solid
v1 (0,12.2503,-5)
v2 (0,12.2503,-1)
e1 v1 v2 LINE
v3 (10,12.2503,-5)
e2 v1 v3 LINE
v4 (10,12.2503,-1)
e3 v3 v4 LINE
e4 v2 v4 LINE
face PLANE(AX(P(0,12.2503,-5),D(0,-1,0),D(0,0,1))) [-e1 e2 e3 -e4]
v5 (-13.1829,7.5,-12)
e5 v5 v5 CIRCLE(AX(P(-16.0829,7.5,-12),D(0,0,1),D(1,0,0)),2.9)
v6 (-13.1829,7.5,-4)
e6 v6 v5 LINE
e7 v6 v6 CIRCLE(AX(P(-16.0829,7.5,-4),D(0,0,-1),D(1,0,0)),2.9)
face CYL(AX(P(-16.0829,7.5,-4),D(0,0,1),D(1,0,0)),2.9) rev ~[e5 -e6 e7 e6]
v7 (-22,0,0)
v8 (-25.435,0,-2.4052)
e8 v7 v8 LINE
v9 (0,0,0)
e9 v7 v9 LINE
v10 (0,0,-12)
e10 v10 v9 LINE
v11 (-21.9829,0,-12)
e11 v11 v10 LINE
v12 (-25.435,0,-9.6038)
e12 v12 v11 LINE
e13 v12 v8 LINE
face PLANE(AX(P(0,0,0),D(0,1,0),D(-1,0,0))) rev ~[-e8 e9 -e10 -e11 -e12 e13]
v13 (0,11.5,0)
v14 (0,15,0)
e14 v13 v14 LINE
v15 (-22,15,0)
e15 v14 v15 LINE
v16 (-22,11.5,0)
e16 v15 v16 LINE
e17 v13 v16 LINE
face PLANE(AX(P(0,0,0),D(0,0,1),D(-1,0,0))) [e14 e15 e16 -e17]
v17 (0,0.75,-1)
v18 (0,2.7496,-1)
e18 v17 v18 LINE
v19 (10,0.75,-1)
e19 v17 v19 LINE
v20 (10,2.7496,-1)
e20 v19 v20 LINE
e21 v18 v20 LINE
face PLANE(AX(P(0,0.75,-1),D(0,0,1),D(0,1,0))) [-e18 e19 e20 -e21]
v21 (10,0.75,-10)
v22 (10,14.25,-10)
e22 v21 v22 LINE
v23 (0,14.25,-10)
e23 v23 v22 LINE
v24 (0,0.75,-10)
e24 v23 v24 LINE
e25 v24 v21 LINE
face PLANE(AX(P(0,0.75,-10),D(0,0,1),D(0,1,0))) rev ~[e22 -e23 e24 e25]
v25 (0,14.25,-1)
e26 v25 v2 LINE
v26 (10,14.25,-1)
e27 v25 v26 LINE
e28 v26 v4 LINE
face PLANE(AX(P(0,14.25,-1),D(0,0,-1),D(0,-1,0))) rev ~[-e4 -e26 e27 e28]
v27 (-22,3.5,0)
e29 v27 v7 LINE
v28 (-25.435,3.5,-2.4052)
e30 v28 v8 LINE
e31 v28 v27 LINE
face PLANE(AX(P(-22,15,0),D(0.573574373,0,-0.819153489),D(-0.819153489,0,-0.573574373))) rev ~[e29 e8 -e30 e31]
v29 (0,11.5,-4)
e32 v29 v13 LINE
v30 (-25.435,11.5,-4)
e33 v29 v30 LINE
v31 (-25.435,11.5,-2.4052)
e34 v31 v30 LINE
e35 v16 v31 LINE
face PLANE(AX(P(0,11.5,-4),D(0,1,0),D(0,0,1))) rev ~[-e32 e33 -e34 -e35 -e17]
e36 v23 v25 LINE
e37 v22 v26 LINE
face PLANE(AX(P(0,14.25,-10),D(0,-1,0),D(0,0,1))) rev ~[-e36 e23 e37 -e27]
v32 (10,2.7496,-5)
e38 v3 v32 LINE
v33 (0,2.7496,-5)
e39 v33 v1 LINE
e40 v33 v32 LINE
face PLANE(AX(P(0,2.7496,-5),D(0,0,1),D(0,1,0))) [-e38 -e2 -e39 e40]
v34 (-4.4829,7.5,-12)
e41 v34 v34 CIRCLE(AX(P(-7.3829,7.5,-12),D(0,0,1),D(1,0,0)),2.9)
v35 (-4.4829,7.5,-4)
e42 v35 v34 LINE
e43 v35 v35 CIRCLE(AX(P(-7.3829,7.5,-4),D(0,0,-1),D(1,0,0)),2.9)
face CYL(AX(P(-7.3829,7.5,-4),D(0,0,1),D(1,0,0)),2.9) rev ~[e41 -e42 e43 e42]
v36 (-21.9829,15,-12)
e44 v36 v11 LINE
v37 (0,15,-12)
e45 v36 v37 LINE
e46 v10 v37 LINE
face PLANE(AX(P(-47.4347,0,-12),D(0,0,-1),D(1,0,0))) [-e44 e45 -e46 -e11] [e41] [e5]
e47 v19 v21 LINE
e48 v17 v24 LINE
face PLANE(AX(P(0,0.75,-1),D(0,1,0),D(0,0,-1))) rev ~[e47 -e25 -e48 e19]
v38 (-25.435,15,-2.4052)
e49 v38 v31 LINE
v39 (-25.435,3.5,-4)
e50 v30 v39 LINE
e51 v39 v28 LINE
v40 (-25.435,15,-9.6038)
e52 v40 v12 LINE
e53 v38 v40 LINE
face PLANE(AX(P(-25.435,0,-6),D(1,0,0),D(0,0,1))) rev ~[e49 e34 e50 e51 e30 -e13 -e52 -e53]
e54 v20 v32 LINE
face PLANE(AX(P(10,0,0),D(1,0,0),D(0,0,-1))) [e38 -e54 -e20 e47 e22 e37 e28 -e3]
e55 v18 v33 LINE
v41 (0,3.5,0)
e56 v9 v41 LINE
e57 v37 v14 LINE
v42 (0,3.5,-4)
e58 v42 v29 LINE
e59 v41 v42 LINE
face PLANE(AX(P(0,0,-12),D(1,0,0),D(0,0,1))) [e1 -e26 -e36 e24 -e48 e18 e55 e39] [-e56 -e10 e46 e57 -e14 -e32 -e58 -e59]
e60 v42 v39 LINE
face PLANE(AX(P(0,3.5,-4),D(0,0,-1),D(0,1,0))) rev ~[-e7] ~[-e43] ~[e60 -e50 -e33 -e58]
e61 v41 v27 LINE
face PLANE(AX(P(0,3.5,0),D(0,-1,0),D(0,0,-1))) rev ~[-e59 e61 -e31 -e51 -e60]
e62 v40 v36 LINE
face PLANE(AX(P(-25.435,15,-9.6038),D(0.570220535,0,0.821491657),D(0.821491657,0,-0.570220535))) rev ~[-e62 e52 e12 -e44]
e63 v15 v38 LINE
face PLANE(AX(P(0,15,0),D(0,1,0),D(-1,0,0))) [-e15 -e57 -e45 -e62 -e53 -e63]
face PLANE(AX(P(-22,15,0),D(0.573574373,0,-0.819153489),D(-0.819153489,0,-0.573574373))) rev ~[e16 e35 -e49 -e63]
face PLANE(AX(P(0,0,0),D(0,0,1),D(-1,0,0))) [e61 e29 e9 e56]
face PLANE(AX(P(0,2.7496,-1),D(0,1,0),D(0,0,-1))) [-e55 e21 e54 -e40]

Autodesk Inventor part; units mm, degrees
ref_plane "YZ Plane" through (0, 0, 0) normal (1, 0, 0) x (0, 1, 0)
ref_plane "XZ Plane" through (0, 0, 0) normal (0, 1, 0) x (-1, 0, 0)
ref_plane "XY Plane" through (0, 0, 0) normal (0, 0, 1) x (1, 0, 0)
sketch "Náčrt1" plane through (0, 0, 0) normal (0, 1, 0) x (-1, 0, 0)
  line L0 (0, 0) -> (50, 0)
  line L1 (50, 0) -> (66.0697, -19.1511)
  line L2 (50, 0) -> (75, 0) construction
  line L3 (66.0697, -19.1511) -> (58.4092, -25.579)
  line L4 (0, -12) -> (0, 0)
  line L5 (58.6554, -25.3724) -> (47.4347, -12)
  line L6 (47.4347, -12) -> (0, -12)
  dimension "d0" = 50
  dimension "d2" = 25
  dimension "d3" = 50
  dimension "d4" = 10
  dimension "d5" = 12
extrude "Vysunutí1" add sketch "Náčrt1" along normal blind 15
sketch "Náčrt11" plane through (0, 0, 0) normal (1, 0, 0) x (0, 0, -1)
  line L0 (0, 0) -> (0, 15) projected
  line L1 (0, 7.5) -> (12, 7.5)
  line L2 (12, 0) -> (12, 15) projected
  line L3 (0, 3.5) -> (4, 3.5)
  line L4 (4, 3.5) -> (4, 11.5)
  line L5 (4, 11.5) -> (0, 11.5)
  line L6 (0, 11.5) -> (0, 3.5)
  point P0 (0, 7.5)
  point P1 (0, 11.5)
  dimension "d64" = 4
  dimension "d65" = 8
extrude "Vysunutí10" cut sketch "Náčrt11" against normal through all
sketch "Náčrt21" plane through (-66.0697, 0, -19.1511) normal (-0.6427876, 0, -0.7660444) x (-0.7660444, 0, 0.6427876)
  line L0 (0, 0) -> (0, 15) projected
  line L1 (0, 3.5) -> (-4, 3.5)
  line L2 (-4, 3.5) -> (-4, 11.5)
  line L3 (-4, 11.5) -> (0, 11.5)
  line L4 (0, 11.5) -> (0, 3.5)
  point P0 (-38.3022, 0)
  point P1 (0, 7.5)
  point P2 (0, 11.5)
  dimension "d68" = 4
  dimension "d69" = 8
extrude "Vysunutí11" cut sketch "Náčrt21" against normal through all
sketch "Náčrt30" plane through (0, 0, -12) normal (0, 0, -1) x (-1, 0, 0)
  point P0 (0, 0)
sketch "Náčrt31" plane through (0, 0, 0) normal (1, 0, 0) x (0, 0, -1)
  point P0 (0, 0)
sketch "Náčrt32" plane through (0, 0, 0) normal (0, -1, 0) x (1, 0, 0)
  line L0 (-47.4347, -12) -> (-58.6554, -25.3724) projected
  line L1 (-47.4347, -12) -> (-47.4347, 0)
  line L2 (-47.4347, -12) -> (-58.6554, -25.3724)
  line L3 (-58.6554, -25.3724) -> (-66.0697, -19.1511) projected
  line L4 (-66.0697, -19.1511) -> (-50, 0)
  line L5 (-50, 0) -> (-47.4347, 0)
  line L6 (-50, 0) -> (0, 0) projected
  point P0 (-47.4347, 0)
extrude "Vysunutí16" add sketch "Náčrt32" against normal through all
sketch "Náčrt33" plane through (0, 0, 0) normal (0, -1, 0) x (1, 0, 0)
  line L0 (-47.4347, -12) -> (-58.6554, -25.3724) projected
  line L1 (-47.4347, -4) -> (-47.4347, 0) projected
  line L2 (-47.4347, -12) -> (-47.4347, 0)
  line L3 (-66.0697, -19.1511) -> (-50, 0) projected
  line L4 (-47.4347, 0) -> (-50, 0)
  line L5 (-50, 0) -> (-66.0697, -19.1511)
  line L6 (-50, 0) -> (0, 0) projected
  line L7 (-66.0697, -19.1511) -> (-50, 0) projected
  line L8 (-58.6554, -25.3724) -> (-66.0697, -19.1511) projected
  line L9 (-47.4347, -12) -> (-58.6554, -25.3724) projected
  line L10 (0, -12) -> (-47.4347, -12) projected
  line L11 (0, 0) -> (0, -12) projected
  line L12 (-58.6554, -25.3724) -> (-66.0697, -19.1511) projected
  line L13 (-66.0697, -19.1511) -> (-58.6554, -25.3724)
  line L14 (-58.6554, -25.3724) -> (-47.4347, -12)
extrude "Vysunutí17" cut sketch "Náčrt33" against normal through all contours L0 L8 L3 L4 L1 L2
sketch "Náčrt34" plane through (0, 0, 0) normal (0, -1, 0) x (1, 0, 0)
  line L0 (-47.4347, 0) -> (-47.4347, -12) projected
  line L1 (-47.4347, 0) -> (-47.4347, -12) projected
  line L2 (0, -12) -> (-47.4347, -12) projected
  line L3 (0, 0) -> (0, -12) projected
  line L4 (-47.4347, 0) -> (0, 0) projected
  line L5 (0, -12) -> (-47.4347, -12) projected
  line L6 (-44, -12) -> (-47.4347, -9.595)
  line L7 (-44, -12) -> (-39.807, -12) construction
  line L8 (-47.4347, -9.595) -> (-47.4347, -12)
  line L9 (-44, -12) -> (-47.4347, -12)
  line L10 (0, 0) -> (-47.4347, 0) projected
  line L11 (-44, 0) -> (-47.0563, -2.14)
  line L12 (-44, 0) -> (-40.269, 0) construction
  line L13 (-47.0563, -2.14) -> (-47.4347, -2.405)
  line L14 (-47.4347, -2.405) -> (-47.4347, 0)
  line L15 (-44, 0) -> (-47.4347, 0)
  dimension "d99" = 145
  dimension "d100" = 145
extrude "Vysunutí18" cut sketch "Náčrt34" against normal through all contours L4 L11 L13 L0 | L6 L2 L0
sketch "Náčrt39" plane through (0, 0, 0) normal (1, 0, 0) x (0, 0, -1)
  line L0 (0, 11.5) -> (0, 15) projected
  line L1 (12, 0) -> (12, 15) projected
  line L2 (0, 0) -> (0, 3.5) projected
  line L3 (1, 0.75) -> (10, 0.75)
  line L4 (10, 14.25) -> (1, 14.25)
  line L5 (1, 14.25) -> (1, 12.2503)
  line L6 (4, 4.7) -> (4, 10.3) projected
  line L7 (5, 12.2503) -> (1, 12.2503)
  line L8 (1, 0.75) -> (1, 2.7496)
  line L9 (1, 2.7496) -> (5, 2.7496)
  line L10 (5, 2.7496) -> (5, 12.2503)
  line L11 (10, 0.75) -> (10, 14.25)
  line L12 (4, 7.5) -> (12, 7.5)
  line L13 (12, 9.95) -> (12, 5.05) projected
  point P0 (1, 1.7498)
  point P1 (5, 7.5)
  point P2 (1, 13.2502)
  point P3 (10, 7.5)
  point P4 (5.5, 0.75)
  dimension "d119" = 13.5
extrude "Vysunutí22" add sketch "Náčrt39" along normal blind 10
sketch "Náčrt40" plane through (0, 0, 0) normal (0, -1, 0) x (1, 0, 0)
  line L0 (-47.4347, -2.405) -> (-47.4347, -9.595) projected
  line L1 (-47.4347, -6) -> (0, -6)
  line L2 (-44, 0) -> (-47.4347, -2.405) projected
  line L3 (-47.4347, -2.405) -> (-47.4347, -9.595) projected
  line L4 (-47.4347, -9.595) -> (-44, -12) projected
  line L5 (0, -12) -> (-44, -12) projected
  line L6 (0, 0) -> (0, -12) projected
  line L7 (-44, 0) -> (0, 0) projected
  line L8 (-27.885, -6) -> (-22.985, -6) projected
  line L9 (-25.435, -6) -> (-25.435, 0)
  line L10 (-25.435, -6) -> (-25.435, -12)
  dimension "d124" = 47.4347
extrude "Vysunutí24" cut sketch "Náčrt40" against normal through all contours L2 L7 L9 L1 L0 | L1 L10 L5 L4 L0
sketch "Náčrt41" plane through (0, 15, 0) normal (0, 1, 0) x (1, 0, 0)
  line L0 (-25.435, 0) -> (0, 0) projected
  line L1 (-25.435, 0) -> (-22, 0)
  line L2 (-22, 0) -> (-25.435, 2.4052)
  line L3 (-25.435, 12) -> (-25.435, 0) projected
  line L4 (-25.435, 2.4052) -> (-25.435, 0)
  line L5 (-22, 0) -> (-25.435, 0)
  line L6 (0, 12) -> (-25.435, 12) projected
  line L7 (-22, 12) -> (-17.9846, 12) construction
  line L8 (-25.435, 9.6038) -> (-21.9829, 12)
  line L9 (-25.435, 9.6038) -> (-25.435, 12)
  line L10 (-21.9829, 12) -> (-25.435, 12)
  dimension "d127" = 3.435
  dimension "d128" = 35
extrude "Vysunutí25" cut sketch "Náčrt41" against normal through all
sketch "Náčrt42" plane through (0, 3.5, -4) normal (0, 0, 1) x (1, 0, 0)
  line L0 (-25.435, 8) -> (-25.435, 0) projected
  line L1 (-25.435, 4) -> (0, 4)
  line L2 (0, -3.5) -> (0, 11.5) projected
  line L3 (-21.9829, -3.5) -> (-21.9829, 11.5) projected
  line L4 (-21.9829, 4) -> (-16.0829, 4)
  circle A0 centre (-16.0829, 4) radius 2.9
  line L5 (-13.1829, 4) -> (-10.1829, 4)
  circle A1 centre (-7.3829, 4) radius 2.9
  line L6 (-10.2829, 7.4092) -> (-10.2829, 0.965)
  dimension "d133" = 5.8
  dimension "d132" = 5.9
  dimension "d134" = 3
  dimension "d136" = 5.8
extrude "Vysunutí26" cut sketch "Náčrt42" against normal through all
properties part number "SEMAFORfinal"
